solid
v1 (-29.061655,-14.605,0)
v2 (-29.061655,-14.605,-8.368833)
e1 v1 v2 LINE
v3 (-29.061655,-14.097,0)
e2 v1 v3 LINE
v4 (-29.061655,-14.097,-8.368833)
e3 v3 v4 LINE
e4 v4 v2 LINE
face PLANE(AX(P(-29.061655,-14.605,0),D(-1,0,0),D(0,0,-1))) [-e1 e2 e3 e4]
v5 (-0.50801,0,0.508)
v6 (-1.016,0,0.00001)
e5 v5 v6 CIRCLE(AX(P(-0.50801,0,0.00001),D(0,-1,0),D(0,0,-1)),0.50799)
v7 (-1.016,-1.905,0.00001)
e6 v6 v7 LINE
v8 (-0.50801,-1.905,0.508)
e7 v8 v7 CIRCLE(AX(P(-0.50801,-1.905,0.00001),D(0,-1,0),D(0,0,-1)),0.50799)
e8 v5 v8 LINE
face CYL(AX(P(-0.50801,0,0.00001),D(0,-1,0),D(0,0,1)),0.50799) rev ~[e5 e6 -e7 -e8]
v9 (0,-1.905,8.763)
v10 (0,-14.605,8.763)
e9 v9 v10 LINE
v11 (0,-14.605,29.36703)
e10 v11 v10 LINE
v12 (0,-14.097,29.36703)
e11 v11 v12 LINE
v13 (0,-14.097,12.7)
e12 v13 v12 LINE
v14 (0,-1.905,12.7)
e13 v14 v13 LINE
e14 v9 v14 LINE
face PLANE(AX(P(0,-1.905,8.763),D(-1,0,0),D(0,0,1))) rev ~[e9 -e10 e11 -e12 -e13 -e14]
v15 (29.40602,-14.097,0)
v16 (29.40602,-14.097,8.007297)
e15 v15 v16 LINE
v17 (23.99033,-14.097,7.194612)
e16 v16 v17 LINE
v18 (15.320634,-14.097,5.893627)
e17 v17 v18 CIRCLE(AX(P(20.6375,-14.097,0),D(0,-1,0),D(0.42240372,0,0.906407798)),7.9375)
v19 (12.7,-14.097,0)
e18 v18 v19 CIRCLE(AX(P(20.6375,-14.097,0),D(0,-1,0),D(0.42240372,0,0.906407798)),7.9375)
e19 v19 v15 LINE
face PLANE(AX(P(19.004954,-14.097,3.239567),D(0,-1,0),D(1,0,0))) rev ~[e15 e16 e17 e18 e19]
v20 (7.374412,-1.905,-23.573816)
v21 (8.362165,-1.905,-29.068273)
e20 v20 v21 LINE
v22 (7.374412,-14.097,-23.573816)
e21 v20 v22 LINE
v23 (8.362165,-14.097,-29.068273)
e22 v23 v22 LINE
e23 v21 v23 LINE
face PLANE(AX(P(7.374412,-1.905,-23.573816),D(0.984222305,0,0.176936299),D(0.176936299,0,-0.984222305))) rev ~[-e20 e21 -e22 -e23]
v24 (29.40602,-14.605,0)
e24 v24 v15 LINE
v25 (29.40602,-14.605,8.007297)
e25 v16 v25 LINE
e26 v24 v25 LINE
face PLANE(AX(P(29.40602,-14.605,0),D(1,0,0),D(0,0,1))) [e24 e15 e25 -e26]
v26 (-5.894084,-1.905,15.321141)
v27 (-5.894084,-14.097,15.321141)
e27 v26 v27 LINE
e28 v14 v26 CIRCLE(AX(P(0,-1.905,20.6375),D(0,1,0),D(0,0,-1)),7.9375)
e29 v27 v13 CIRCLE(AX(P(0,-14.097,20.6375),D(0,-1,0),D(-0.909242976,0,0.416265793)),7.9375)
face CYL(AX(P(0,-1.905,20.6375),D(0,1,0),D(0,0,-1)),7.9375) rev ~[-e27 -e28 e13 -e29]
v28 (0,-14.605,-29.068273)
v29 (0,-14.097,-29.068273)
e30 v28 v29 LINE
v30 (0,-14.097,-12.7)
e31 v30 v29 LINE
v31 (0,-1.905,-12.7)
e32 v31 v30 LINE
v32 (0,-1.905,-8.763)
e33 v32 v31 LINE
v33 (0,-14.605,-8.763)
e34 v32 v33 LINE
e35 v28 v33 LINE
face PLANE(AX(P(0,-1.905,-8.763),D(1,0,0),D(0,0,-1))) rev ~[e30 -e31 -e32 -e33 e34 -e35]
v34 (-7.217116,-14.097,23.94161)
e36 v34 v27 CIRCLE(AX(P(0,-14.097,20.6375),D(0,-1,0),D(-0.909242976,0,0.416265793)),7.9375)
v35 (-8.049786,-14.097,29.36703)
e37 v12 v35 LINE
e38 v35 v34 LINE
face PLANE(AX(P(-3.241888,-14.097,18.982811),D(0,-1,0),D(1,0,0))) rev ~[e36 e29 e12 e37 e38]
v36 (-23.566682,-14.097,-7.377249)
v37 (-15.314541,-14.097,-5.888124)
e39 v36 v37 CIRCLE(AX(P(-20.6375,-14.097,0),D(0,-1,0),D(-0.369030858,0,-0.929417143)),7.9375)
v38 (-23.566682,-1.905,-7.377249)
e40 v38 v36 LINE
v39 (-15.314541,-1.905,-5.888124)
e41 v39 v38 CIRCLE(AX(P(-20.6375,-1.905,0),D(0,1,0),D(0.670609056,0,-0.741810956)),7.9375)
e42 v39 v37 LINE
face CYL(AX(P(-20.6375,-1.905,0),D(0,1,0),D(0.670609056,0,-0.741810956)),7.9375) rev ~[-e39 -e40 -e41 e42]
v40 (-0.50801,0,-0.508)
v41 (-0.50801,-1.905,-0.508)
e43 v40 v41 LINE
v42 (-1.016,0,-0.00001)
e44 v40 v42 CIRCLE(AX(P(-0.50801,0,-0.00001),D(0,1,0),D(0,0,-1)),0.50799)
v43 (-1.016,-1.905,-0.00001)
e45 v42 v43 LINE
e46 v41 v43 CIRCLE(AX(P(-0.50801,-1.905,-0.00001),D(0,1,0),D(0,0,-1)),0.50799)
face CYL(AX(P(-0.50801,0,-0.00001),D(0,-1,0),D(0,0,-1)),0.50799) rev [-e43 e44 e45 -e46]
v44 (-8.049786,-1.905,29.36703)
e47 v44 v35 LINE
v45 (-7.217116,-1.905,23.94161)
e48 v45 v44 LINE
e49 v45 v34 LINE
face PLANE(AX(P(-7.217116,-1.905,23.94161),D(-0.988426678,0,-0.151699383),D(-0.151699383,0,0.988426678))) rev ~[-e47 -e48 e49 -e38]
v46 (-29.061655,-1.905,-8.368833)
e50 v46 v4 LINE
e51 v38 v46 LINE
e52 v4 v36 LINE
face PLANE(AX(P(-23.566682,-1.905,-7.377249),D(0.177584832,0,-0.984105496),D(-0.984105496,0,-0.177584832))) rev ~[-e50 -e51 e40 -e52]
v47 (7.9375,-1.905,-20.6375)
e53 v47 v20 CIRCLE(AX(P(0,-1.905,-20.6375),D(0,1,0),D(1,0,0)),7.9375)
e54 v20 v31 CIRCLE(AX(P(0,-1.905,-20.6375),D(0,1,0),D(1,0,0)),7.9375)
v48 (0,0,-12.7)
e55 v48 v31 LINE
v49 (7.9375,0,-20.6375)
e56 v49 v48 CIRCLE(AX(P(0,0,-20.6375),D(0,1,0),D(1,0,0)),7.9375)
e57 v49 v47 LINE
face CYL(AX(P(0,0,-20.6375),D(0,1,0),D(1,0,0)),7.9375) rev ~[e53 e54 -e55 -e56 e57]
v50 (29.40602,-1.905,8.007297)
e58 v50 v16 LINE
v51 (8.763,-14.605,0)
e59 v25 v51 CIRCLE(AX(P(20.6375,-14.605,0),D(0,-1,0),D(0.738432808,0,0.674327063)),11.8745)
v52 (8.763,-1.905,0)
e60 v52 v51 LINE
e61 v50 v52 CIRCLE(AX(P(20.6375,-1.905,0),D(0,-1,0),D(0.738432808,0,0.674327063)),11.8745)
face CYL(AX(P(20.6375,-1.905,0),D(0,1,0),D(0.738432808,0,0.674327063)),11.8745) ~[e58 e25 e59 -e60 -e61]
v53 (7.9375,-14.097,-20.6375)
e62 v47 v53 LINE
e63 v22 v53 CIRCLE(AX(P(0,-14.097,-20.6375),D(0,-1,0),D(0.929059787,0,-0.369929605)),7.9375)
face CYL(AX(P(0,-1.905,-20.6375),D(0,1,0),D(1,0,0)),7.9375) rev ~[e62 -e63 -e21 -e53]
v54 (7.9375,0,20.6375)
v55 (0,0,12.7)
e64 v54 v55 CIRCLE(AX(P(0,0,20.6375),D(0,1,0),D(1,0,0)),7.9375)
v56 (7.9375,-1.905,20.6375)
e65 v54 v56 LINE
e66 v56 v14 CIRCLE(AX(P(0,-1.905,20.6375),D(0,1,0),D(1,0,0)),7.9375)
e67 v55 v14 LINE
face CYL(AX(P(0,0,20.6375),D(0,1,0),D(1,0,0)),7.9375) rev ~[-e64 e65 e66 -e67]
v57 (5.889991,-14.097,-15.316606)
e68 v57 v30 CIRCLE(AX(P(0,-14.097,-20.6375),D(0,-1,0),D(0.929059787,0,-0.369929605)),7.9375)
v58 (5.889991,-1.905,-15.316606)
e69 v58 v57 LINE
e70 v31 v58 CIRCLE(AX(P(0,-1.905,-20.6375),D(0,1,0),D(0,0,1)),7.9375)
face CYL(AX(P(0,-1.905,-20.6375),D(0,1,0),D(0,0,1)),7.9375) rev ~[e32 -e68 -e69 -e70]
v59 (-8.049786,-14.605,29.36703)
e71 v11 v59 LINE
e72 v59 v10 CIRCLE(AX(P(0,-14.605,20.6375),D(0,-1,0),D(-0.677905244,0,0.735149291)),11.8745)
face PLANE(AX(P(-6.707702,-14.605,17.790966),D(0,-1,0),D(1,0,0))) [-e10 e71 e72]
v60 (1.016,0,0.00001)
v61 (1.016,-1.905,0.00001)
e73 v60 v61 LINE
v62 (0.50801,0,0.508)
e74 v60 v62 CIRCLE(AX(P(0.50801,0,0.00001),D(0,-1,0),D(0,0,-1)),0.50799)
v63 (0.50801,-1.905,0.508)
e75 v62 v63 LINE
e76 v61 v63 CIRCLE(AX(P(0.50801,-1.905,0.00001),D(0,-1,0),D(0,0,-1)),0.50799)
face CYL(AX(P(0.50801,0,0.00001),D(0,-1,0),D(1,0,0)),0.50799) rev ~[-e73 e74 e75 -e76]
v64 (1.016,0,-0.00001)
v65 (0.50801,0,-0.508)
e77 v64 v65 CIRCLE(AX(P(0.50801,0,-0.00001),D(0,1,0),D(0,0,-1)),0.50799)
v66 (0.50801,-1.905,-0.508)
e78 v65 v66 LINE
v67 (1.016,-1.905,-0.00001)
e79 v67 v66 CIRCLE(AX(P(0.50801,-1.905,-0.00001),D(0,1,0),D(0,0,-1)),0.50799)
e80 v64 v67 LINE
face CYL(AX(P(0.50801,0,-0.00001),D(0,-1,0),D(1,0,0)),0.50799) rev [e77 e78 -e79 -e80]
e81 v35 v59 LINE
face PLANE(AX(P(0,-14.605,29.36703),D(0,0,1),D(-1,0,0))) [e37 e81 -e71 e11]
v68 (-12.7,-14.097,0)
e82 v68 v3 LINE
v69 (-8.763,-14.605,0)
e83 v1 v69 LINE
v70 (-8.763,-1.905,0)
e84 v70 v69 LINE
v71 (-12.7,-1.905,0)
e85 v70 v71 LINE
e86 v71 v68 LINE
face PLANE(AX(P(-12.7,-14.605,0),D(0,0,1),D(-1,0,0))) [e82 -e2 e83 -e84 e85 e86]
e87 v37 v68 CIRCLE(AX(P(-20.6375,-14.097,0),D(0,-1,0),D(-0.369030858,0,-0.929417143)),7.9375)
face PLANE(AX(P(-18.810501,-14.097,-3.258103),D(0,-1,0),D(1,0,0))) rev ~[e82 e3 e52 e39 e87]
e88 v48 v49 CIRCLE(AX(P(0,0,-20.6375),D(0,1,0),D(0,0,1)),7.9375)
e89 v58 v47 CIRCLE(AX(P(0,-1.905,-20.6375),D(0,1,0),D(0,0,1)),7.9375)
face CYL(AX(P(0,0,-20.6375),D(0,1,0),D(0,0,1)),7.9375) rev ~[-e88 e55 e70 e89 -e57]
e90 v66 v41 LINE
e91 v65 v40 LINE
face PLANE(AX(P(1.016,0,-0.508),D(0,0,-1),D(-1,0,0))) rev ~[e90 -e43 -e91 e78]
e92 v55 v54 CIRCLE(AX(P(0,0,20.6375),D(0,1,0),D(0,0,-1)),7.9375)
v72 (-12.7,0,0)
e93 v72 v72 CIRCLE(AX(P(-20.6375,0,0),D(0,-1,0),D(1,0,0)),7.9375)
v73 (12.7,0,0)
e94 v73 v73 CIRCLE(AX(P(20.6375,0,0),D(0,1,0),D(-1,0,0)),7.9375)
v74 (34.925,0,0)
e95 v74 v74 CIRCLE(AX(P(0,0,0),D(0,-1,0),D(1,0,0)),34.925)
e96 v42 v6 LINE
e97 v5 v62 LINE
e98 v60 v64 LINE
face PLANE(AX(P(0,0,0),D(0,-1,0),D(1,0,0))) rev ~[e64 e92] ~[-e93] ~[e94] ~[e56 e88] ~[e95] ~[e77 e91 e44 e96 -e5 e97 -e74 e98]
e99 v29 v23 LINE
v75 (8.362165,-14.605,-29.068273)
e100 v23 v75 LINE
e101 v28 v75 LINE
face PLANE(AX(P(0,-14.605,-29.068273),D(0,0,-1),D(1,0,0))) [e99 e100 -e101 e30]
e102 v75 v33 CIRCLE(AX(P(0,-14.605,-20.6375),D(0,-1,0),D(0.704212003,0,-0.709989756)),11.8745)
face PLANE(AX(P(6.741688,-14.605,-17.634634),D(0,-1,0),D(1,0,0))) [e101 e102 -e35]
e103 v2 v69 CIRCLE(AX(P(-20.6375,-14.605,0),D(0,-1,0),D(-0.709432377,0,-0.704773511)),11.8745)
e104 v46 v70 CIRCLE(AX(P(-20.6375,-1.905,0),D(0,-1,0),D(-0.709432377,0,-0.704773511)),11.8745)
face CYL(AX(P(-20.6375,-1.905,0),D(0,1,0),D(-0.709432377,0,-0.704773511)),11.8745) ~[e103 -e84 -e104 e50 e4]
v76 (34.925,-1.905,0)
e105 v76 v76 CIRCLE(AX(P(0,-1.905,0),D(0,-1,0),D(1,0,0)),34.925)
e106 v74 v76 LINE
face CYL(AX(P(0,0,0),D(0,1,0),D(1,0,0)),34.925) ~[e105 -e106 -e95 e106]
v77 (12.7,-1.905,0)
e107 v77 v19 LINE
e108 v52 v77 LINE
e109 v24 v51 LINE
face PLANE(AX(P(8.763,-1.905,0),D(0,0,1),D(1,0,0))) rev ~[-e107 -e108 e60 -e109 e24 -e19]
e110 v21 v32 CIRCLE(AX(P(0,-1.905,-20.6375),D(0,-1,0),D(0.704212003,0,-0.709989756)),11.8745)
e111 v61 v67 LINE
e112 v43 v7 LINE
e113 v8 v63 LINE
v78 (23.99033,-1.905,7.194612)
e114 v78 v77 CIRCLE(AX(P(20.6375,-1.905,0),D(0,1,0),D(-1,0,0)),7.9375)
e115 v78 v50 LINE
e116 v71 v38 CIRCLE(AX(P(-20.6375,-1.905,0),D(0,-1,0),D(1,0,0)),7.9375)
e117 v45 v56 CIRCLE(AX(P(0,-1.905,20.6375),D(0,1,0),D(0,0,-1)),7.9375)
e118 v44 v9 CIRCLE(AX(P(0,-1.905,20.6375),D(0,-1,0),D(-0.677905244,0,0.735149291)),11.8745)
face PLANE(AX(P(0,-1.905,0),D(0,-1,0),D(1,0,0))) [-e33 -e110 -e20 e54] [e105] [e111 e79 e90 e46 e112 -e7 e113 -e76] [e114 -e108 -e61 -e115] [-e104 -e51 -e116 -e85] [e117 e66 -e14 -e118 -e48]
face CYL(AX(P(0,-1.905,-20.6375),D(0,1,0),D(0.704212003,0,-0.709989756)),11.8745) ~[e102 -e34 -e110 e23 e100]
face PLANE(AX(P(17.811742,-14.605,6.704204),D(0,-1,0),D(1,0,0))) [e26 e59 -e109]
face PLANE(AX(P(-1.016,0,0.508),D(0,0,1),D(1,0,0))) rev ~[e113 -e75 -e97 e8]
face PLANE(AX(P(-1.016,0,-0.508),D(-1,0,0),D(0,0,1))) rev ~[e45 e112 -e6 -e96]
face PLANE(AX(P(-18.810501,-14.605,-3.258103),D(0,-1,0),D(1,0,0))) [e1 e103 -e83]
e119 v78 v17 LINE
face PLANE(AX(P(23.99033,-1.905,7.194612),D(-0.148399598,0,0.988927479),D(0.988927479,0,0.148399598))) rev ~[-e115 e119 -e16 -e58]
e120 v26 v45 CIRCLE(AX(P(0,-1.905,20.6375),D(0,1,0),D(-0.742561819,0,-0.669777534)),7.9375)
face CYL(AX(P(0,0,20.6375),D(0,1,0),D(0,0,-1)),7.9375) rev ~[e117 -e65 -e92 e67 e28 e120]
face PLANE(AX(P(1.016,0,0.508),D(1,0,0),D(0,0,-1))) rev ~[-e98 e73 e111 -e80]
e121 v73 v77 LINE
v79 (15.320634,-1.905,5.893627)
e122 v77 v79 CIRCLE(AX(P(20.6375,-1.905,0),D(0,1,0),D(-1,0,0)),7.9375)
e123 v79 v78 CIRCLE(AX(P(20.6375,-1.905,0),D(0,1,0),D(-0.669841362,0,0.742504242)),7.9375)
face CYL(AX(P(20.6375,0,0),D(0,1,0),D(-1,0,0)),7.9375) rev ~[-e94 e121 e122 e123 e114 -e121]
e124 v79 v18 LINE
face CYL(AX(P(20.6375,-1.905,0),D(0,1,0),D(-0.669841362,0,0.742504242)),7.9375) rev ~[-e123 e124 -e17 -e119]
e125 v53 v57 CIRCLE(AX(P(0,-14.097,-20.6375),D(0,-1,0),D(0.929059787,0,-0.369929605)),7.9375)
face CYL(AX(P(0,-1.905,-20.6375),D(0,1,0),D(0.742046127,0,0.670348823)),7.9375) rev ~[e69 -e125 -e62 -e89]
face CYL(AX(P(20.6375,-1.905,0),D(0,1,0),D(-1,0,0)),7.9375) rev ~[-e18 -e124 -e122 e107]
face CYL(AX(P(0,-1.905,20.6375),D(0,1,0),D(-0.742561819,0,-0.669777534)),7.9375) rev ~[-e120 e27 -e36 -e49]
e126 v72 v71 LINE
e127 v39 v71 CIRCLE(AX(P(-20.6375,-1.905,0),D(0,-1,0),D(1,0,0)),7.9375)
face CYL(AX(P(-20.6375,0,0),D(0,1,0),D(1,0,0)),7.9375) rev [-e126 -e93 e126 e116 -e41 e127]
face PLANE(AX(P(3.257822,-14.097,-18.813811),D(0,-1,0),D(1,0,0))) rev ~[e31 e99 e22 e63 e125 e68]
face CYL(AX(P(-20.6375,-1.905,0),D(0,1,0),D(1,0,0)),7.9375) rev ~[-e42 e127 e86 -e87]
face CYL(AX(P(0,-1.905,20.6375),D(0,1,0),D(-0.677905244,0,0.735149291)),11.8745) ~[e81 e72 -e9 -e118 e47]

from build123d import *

# Parameters (mm, degrees)
F0_R     = 34.925
F0_R_2   = 7.9375
F1_DEPTH = 1.905
F3_DEPTH = 12.7
F8_DEPTH = 0.508
F9_R     = 0.50799


# Not quite as in the source:
# - a fillet or chamfer is up to 0.001 mm smaller than in the source, because OpenCascade refuses the exact size


with BuildPart() as f1:
    # F0 (on Front) → F1 (new body)
    with BuildSketch(Plane.XZ):
        Circle(F0_R)
        with BuildLine():
            ThreePointArc((7.9375, -20.6375), (-5.6126600757, -26.2501600757), (0, -12.7))
            ThreePointArc((0, -12.7), (5.6126600757, -15.0248399243), (7.9375, -20.6375))
        make_face(mode=Mode.SUBTRACT)
        with Locations((-20.6375, 0)):
            Circle(F0_R_2, mode=Mode.SUBTRACT)
        Polygon((-1.016, 0), (-1.016, 0.508), (0, 0.508), (1.016, 0.508), (1.016, 0), (1.016, -0.508), (0, -0.508), (-1.016, -0.508), align=None, mode=Mode.SUBTRACT)
        with BuildLine():
            ThreePointArc((28.575, 0), (20.6375, -7.9375), (12.7, 0))
            ThreePointArc((12.7, 0), (20.6375, 7.9375), (28.575, 0))
        make_face(mode=Mode.SUBTRACT)
        with BuildLine():
            ThreePointArc((7.9375, 20.6375), (5.6126600757, 15.0248399243), (0, 12.7))
            ThreePointArc((0, 12.7), (-5.6126600757, 26.2501600757), (7.9375, 20.6375))
        make_face(mode=Mode.SUBTRACT)
    extrude(amount=F1_DEPTH)

    # F2 (on face) → F3 (join)
    with BuildSketch(Plane.XZ.offset(1.905)):
        with BuildLine():
            Line((-7.217116123, 23.9416097315), (-8.0497858212, 29.3670302556))
            ThreePointArc((-8.0497858212, 29.3670302556), (-11.0603471299, 16.316334461), (0, 8.763))
            Line((0, 8.763), (0, 12.7))
            ThreePointArc((0, 12.7), (-3.2253143504, 13.384827831), (-5.894084441, 15.3211408274))
            ThreePointArc((-5.894084441, 15.3211408274), (-7.8456367548, 19.4333861511), (-7.217116123, 23.9416097315))
        make_face()
        with BuildLine():
            Line((-23.5666824339, -7.3772485737), (-29.061654765, -8.3688330575))
            ThreePointArc((-29.061654765, -8.3688330575), (-16.1114020949, -10.9780776097), (-8.763, 0))
            Line((-8.763, 0), (-12.7, 0))
            ThreePointArc((-12.7, 0), (-13.3830221995, -3.2212510135), (-15.3145406216, -5.8881244642))
            ThreePointArc((-15.3145406216, -5.8881244642), (-19.2279203931, -7.8113373747), (-23.5666824339, -7.3772485737))
        make_face()
        with BuildLine():
            Line((23.9903295305, 7.1946118999), (29.4060203782, 8.0072967115))
            ThreePointArc((29.4060203782, 8.0072967115), (16.3432040729, 11.0708072308), (8.763, 0))
            Line((8.763, 0), (12.7, 0))
            ThreePointArc((12.7, 0), (13.384689213, 3.225002626), (15.3206341891, 5.8936274228))
            ThreePointArc((15.3206341891, 5.8936274228), (19.4595781944, 7.8496118675), (23.9903295305, 7.1946118999))
        make_face()
        with BuildLine():
            Line((7.374412056, -23.5738162429), (8.3621654342, -29.0682733631))
            ThreePointArc((8.3621654342, -29.0682733631), (10.9798672248, -16.1157452549), (0, -8.763))
            Line((0, -8.763), (0, -12.7))
            ThreePointArc((0, -12.7), (3.2225232211, -13.3835872393), (5.8899911345, -15.3166062137))
            ThreePointArc((5.8899911345, -15.3166062137), (7.4079589254, -17.786877119), (7.9375, -20.6375))
            ThreePointArc((7.9375, -20.6375), (7.7954570727, -22.1324097892), (7.374412056, -23.5738162429))
        make_face()
    extrude(amount=F3_DEPTH)

    # F4 (on face) + F7 (on face) + F6 (on face) + F5 (on face) → F8 (join)
    with BuildSketch(Plane.XZ.offset(14.605)):
        with BuildLine():
            Line((-12.7, 0), (-20.6375, 0))
            Line((-20.6375, 0), (-23.5666824339, 0))
            Line((-23.5666824339, 0), (-23.5666824339, -7.3772485737))
            ThreePointArc((-23.5666824339, -7.3772485737), (-16.1791639494, -6.567126153), (-12.7, 0))
        make_face()
        Polygon((-23.5666824339, -7.3772485737), (-23.5666824339, 0), (-29.061654765, 0), (-29.061654765, -8.3688330575), align=None)
    with BuildSketch(Plane.XZ.offset(14.605)):
        with BuildLine():
            Line((0, 23.9416097315), (-7.217116123, 23.9416097315))
            ThreePointArc((-7.217116123, 23.9416097315), (-6.6794564616, 16.3492873621), (0, 12.7))
            Line((0, 12.7), (0, 20.6375))
            Line((0, 20.6375), (0, 23.9416097315))
        make_face()
        Polygon((-8.0497858212, 29.3670302556), (-7.217116123, 23.9416097315), (0, 23.9416097315), (0, 29.3670302556), align=None)
    with BuildSketch(Plane.XZ.offset(14.605)):
        with BuildLine():
            ThreePointArc((23.9903295305, 7.1946118999), (16.3718920801, 6.6939147981), (12.7, 0))
            Line((12.7, 0), (20.6375, 0))
            Line((20.6375, 0), (23.9903295305, 0))
            Line((23.9903295305, 0), (23.9903295305, 7.1946118999))
        make_face()
        Polygon((29.4060203782, 8.0072967115), (23.9903295305, 7.1946118999), (23.9903295305, 0), (29.4060203782, 0), align=None)
    with BuildSketch(Plane.XZ.offset(14.605)):
        with BuildLine():
            Line((0, -12.7), (0, -20.6375))
            Line((0, -20.6375), (0, -23.5738162429))
            Line((0, -23.5738162429), (7.374412056, -23.5738162429))
            ThreePointArc((7.374412056, -23.5738162429), (6.5692814077, -16.1823402906), (0, -12.7))
        make_face()
        Polygon((7.374412056, -23.5738162429), (0, -23.5738162429), (0, -29.0682733631), (8.3621654342, -29.0682733631), align=None)
    extrude(amount=-F8_DEPTH)

    # F9 (radius 0.508 in the source; OpenCascade refuses exactly that, so slightly less here)
    f9_edges = [f1.edges().sort_by_distance(p)[0] for p in [
        (1.016, -0.9525, 0.508),
        (1.016, -0.9525, -0.508),
        (-1.016, -0.9525, -0.508),
        (-1.016, -0.9525, 0.508),
    ]]
    fillet(f9_edges, radius=F9_R)


solid = f1.part
